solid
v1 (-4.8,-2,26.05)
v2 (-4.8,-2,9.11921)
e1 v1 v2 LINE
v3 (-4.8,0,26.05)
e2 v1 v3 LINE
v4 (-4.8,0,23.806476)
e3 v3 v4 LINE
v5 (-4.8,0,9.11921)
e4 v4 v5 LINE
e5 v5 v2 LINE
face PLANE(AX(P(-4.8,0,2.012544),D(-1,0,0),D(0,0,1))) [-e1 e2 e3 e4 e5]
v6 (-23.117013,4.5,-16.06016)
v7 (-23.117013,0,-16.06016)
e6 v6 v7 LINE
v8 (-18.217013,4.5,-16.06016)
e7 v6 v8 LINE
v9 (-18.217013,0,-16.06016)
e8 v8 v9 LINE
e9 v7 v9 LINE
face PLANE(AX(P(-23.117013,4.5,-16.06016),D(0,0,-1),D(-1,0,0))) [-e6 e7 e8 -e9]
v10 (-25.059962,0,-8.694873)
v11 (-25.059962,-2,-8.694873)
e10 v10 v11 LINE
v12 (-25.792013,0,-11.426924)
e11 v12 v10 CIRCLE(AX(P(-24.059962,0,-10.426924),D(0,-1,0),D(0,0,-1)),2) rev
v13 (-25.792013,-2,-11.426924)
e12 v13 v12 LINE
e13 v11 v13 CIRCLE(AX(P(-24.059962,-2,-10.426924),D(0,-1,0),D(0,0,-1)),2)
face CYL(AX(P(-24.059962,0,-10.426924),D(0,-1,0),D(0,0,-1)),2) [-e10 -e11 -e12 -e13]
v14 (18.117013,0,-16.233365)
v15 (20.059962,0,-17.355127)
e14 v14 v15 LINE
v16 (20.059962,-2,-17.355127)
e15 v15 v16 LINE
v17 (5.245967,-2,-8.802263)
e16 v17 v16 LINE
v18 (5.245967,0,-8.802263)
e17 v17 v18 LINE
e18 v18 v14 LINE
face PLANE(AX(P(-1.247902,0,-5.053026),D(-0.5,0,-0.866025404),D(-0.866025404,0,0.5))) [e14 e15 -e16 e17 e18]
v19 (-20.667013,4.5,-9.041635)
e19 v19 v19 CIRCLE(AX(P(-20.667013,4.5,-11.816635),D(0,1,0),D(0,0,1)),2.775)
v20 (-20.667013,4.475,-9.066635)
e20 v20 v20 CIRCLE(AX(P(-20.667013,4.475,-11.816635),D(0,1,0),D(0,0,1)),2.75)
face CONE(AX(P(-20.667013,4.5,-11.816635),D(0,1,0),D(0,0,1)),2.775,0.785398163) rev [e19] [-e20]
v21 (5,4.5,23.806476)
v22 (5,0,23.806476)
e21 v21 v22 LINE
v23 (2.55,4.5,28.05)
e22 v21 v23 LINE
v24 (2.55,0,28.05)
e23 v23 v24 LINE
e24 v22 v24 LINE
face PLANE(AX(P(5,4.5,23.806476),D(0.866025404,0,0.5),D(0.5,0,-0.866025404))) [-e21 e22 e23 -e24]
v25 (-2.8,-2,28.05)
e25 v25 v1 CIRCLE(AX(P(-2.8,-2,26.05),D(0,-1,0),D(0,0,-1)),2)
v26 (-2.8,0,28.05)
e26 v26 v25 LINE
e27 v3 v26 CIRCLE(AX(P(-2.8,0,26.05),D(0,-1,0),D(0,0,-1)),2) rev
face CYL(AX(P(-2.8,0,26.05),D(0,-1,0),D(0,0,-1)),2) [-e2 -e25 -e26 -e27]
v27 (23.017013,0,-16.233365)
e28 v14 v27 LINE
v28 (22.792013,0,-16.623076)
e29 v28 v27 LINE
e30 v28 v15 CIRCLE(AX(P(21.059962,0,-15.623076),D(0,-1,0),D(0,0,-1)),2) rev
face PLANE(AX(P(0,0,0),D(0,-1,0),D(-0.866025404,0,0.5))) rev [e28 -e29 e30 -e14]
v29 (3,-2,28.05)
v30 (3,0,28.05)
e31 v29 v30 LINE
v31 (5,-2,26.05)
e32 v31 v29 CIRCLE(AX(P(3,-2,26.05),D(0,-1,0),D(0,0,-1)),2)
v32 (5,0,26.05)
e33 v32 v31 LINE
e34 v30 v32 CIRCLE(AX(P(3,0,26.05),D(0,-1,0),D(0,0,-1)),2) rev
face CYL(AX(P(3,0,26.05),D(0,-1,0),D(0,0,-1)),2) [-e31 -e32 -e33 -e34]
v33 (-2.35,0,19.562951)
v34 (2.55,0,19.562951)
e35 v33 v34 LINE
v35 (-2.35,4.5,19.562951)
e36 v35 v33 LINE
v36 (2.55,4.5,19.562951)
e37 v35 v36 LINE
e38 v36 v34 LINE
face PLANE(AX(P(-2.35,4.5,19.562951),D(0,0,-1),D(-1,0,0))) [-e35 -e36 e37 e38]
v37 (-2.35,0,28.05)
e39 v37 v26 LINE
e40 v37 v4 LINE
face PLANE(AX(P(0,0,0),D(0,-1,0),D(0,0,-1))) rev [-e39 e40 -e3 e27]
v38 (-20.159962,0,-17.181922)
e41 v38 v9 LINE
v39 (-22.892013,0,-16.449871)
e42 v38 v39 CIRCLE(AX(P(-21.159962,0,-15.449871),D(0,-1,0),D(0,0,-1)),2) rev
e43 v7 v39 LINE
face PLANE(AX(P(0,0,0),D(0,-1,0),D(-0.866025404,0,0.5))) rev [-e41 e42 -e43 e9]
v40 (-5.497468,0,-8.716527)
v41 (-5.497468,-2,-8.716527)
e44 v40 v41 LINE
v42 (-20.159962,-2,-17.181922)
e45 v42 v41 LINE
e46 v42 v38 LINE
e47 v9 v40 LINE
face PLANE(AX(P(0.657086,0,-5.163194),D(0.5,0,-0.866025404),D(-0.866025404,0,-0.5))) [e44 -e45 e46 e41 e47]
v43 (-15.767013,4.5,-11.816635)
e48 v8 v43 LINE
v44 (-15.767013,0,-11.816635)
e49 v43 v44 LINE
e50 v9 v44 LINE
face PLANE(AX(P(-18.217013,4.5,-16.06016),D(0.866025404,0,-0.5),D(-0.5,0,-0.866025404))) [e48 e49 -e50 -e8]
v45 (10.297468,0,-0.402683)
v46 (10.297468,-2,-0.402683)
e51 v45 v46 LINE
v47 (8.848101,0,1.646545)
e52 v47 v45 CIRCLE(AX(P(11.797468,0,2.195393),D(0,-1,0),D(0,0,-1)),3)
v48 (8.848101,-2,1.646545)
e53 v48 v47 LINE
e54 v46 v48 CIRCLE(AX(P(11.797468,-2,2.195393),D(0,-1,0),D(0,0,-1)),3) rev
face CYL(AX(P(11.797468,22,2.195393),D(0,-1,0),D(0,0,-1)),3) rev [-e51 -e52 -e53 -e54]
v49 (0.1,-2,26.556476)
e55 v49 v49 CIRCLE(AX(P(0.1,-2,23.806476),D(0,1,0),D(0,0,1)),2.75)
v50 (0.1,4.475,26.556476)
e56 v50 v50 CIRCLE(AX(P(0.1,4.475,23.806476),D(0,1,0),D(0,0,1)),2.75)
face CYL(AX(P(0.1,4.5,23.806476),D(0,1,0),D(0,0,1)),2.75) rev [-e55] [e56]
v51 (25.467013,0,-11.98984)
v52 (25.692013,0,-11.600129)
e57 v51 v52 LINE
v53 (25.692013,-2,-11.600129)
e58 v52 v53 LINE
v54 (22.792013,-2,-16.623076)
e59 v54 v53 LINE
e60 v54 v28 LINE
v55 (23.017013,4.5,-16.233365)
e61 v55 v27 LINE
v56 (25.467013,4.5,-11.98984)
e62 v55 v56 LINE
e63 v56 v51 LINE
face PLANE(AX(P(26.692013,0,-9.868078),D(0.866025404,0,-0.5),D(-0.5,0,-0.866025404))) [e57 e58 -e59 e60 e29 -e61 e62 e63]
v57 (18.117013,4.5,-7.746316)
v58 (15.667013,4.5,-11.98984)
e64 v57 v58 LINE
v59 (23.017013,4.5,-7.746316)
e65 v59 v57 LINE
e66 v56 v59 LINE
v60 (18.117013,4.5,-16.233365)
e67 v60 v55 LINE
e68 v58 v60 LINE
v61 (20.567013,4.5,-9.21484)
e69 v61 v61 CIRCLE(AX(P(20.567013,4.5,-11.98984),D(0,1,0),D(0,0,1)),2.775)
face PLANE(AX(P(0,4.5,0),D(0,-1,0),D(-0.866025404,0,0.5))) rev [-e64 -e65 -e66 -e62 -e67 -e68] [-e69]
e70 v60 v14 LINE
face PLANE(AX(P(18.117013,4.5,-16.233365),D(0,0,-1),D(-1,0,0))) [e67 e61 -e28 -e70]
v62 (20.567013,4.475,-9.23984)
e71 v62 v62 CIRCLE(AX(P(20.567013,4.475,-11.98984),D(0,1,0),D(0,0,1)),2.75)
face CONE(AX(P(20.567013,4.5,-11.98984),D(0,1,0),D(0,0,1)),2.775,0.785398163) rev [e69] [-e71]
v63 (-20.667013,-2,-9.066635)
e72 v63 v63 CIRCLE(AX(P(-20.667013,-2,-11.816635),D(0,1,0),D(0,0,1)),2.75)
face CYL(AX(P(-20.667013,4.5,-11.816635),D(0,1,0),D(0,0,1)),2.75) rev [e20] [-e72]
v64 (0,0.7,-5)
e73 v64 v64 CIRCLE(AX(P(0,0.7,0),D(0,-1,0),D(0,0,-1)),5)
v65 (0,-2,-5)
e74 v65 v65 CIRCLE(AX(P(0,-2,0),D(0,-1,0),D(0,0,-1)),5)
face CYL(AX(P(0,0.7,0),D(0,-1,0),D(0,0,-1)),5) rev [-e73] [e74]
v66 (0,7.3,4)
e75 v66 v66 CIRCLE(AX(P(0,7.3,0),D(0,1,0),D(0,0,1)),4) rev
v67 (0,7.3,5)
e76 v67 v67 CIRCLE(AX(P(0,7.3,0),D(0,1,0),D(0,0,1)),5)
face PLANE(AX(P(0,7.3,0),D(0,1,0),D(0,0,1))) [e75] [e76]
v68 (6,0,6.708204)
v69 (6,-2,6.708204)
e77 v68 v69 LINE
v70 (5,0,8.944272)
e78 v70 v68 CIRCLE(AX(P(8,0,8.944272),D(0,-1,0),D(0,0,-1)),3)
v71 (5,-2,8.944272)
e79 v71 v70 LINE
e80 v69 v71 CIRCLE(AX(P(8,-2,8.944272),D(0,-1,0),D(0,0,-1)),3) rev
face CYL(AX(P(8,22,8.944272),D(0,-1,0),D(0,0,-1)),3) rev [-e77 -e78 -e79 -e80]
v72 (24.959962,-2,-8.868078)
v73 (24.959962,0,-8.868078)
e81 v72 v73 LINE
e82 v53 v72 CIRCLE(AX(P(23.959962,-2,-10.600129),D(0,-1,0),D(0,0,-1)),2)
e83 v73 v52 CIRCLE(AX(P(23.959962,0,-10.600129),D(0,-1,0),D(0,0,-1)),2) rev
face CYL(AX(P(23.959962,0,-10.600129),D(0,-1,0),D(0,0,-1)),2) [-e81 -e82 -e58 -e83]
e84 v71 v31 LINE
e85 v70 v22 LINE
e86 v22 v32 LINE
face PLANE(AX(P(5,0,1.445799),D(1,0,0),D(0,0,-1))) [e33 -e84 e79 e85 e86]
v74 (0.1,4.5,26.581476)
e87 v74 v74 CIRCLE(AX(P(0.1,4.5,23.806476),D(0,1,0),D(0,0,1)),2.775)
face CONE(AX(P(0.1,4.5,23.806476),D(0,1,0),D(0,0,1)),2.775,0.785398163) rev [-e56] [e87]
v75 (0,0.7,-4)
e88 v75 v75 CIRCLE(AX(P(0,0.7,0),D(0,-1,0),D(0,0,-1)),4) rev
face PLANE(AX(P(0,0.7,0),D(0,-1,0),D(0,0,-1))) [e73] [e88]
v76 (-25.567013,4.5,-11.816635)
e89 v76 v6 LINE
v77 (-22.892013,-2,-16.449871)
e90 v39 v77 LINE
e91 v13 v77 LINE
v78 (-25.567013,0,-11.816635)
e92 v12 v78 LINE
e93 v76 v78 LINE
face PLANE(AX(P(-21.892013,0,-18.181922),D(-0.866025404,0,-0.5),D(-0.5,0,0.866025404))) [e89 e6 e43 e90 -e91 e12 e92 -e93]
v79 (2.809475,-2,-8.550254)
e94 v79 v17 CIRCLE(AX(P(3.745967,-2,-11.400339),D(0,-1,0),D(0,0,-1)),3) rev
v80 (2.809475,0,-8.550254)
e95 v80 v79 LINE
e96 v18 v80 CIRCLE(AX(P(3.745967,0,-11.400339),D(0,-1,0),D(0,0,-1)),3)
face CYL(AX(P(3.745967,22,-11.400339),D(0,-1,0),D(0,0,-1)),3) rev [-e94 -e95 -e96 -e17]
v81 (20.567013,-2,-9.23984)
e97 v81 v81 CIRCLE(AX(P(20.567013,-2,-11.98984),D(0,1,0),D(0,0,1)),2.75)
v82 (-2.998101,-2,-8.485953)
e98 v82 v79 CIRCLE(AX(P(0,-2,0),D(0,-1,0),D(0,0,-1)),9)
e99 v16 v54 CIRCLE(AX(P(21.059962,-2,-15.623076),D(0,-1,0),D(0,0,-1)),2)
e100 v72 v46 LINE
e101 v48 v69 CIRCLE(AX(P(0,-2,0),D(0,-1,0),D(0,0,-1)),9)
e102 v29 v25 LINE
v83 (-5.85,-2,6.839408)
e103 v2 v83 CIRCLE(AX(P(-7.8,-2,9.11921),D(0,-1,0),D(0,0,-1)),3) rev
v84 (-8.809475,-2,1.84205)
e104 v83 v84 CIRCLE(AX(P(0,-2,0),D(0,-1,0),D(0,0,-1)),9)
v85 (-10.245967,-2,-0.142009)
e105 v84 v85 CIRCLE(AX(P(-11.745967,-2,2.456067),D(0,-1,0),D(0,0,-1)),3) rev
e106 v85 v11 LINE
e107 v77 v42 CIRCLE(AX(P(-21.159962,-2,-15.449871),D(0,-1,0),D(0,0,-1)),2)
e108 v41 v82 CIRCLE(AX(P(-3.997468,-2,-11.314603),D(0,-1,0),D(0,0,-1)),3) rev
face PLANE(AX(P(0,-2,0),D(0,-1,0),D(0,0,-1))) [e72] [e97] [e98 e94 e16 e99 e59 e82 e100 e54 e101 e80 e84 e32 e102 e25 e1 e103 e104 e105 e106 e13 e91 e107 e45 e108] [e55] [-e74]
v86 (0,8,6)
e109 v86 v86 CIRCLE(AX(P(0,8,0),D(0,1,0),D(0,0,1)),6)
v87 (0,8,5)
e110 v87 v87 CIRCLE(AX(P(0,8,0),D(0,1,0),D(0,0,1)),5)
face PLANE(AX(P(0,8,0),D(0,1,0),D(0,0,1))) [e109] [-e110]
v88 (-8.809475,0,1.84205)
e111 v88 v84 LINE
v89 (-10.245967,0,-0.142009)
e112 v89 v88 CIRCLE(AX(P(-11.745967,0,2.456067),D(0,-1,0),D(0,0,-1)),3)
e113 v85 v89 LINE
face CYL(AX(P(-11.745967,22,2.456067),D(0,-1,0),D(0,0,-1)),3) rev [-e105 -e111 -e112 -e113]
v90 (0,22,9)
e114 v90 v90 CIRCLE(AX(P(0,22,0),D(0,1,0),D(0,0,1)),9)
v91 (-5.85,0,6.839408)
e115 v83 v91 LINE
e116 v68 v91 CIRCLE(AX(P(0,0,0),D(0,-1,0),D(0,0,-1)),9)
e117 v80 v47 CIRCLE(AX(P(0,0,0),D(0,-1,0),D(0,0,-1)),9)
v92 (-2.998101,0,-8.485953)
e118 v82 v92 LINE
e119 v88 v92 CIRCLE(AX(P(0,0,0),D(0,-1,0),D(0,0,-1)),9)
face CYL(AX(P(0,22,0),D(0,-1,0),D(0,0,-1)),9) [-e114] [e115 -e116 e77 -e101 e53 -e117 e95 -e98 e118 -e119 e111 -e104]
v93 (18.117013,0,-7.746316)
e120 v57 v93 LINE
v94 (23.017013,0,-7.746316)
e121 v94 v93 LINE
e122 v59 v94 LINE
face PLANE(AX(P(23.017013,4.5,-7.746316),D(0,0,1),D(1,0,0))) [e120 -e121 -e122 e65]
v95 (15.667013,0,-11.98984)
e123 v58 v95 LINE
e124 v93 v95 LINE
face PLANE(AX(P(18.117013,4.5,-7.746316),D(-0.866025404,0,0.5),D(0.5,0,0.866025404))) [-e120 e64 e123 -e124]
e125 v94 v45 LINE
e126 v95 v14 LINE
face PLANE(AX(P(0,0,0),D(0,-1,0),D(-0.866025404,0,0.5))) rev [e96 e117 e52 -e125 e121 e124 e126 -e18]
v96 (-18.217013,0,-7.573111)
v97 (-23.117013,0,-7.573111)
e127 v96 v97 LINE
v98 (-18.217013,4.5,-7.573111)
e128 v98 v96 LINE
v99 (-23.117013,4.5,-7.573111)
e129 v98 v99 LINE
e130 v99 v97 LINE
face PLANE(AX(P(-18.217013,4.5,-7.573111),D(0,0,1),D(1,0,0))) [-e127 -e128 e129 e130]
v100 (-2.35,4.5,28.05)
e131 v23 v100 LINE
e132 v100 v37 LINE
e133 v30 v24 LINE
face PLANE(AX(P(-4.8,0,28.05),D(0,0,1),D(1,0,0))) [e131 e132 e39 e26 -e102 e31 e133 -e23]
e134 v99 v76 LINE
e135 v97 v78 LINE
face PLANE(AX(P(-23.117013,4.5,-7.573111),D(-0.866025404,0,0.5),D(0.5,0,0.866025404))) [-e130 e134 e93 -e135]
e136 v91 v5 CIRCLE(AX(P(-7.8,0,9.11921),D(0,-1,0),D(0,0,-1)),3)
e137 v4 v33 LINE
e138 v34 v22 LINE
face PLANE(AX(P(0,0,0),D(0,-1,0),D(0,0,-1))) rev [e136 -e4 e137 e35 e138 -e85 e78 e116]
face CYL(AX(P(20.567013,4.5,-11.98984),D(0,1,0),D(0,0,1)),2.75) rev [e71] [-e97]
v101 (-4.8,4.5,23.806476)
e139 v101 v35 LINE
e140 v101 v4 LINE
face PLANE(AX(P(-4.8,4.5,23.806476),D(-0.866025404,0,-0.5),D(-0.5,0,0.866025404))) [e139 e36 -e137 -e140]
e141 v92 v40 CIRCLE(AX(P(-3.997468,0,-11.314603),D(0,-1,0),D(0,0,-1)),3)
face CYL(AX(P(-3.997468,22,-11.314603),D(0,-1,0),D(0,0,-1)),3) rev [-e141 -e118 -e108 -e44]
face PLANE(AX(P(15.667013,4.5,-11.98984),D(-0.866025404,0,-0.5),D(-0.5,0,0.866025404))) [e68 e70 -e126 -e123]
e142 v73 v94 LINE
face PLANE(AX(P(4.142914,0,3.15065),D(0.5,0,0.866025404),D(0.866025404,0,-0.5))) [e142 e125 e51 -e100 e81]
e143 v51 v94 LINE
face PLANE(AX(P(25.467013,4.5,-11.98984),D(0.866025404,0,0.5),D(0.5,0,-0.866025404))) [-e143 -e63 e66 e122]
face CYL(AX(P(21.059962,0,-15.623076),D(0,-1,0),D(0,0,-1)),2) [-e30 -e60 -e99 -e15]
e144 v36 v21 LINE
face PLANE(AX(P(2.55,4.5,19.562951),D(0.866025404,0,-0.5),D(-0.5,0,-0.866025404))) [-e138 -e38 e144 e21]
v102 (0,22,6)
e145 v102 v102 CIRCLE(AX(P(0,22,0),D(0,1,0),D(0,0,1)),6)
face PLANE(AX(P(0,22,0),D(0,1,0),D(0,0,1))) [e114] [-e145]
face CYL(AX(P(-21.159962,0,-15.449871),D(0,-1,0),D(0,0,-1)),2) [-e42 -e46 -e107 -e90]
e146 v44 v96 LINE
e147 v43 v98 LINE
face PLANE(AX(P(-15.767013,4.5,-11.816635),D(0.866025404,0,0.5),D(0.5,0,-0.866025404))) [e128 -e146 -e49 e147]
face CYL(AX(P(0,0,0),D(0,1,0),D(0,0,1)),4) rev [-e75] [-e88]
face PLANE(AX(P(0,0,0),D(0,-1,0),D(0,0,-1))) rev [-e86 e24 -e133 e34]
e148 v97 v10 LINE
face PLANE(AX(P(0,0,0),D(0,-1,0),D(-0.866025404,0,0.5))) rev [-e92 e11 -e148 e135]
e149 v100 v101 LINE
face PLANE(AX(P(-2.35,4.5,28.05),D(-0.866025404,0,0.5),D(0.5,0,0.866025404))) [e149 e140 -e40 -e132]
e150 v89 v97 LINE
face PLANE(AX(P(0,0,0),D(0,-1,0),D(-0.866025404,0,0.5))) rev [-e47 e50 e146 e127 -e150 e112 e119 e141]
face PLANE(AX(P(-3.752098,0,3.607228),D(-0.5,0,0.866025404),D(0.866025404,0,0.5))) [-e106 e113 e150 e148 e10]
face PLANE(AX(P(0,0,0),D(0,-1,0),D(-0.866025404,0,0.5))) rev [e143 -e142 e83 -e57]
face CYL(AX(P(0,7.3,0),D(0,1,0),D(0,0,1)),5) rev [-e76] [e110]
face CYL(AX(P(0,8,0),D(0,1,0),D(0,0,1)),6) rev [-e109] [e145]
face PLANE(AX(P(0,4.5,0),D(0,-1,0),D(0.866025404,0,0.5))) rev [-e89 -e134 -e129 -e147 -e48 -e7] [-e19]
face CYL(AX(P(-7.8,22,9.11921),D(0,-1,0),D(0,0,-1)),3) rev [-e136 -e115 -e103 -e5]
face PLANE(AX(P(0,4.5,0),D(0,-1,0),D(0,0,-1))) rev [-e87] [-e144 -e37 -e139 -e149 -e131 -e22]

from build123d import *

# Parameters (mm, degrees)
ESQUISSE2_R                  = 9
BOSS_EXTRU_1_DEPTH           = 22
ESQUISSE5_R                  = 5
BOSS_EXTRU_3_DEPTH           = 2
ESQUISSE6_R                  = 6
ENL_V_MAT_EXTRU_2_DEPTH      = 14
ESQUISSE7_R                  = 4
ENL_V_MAT_EXTRU_3_DEPTH      = 19.920887928
ESQUISSE8_R                  = 5
ENL_V_MAT_EXTRU_4_DEPTH      = 0.7
ENL_V_START                  = -0.7
ESQUISSE9_R                  = 5
ENL_V_MAT_EXTRU_5_DEPTH      = 0.7
BOSS_EXTRU_4_START           = 2
ESQUISSE11_R                 = 9
ESQUISSE11_R_2               = 5
BOSS_EXTRU_4_DEPTH           = 2
BOSS_EXTRU_5_DEPTH           = 2
R_P_TITION_CIRCULAIRE1_COUNT = 3
BOSS_EXTRU_6_DEPTH           = 6.5
R_P_TITION_CIRCULAIRE2_COUNT = 3
D_GAGEMENT_M51_D             = 5.5
D_GAGEMENT_M51_CSINK_D       = 5.55
D_GAGEMENT_M51_CSINK_ANGLE   = 90
R_P_TITION_CIRCULAIRE3_COUNT = 3
CONG_1_R                     = 3
CONG_2_R                     = 3
CONG_3_R                     = 2


with BuildPart() as part:
    # Esquisse2 → Boss.-Extru.1 (new body)
    with BuildSketch(Plane(origin=(0, 0, 0), x_dir=(1, 0, 0), z_dir=(0, 1, 0))):
        Circle(ESQUISSE2_R)
    extrude(amount=BOSS_EXTRU_1_DEPTH)

    # Esquisse5 → Boss.-Extru.3 (add)
    with BuildSketch(Plane(origin=(0, 22, 0), x_dir=(1, 0, 0), z_dir=(0, 1, 0))):
        Circle(ESQUISSE5_R)
    extrude(amount=-BOSS_EXTRU_3_DEPTH)

    # Esquisse6 → Enlèv. mat.-Extru.2 (cut)
    with BuildSketch(Plane(origin=(0, 22, 0), x_dir=(1, 0, 0), z_dir=(0, 1, 0))):
        Circle(ESQUISSE6_R)
    extrude(amount=-ENL_V_MAT_EXTRU_2_DEPTH, mode=Mode.SUBTRACT)

    # Esquisse7 → Enlèv. mat.-Extru.3 (cut, through all)
    with BuildSketch(Plane(origin=(0, 8, 0), x_dir=(1, 0, 0), z_dir=(0, 1, 0))):
        Circle(ESQUISSE7_R)
    extrude(amount=-ENL_V_MAT_EXTRU_3_DEPTH, mode=Mode.SUBTRACT)

    # Esquisse8 → Enlèv. mat.-Extru.4 (cut)
    with BuildSketch(Plane.XZ):
        Circle(ESQUISSE8_R)
    extrude(amount=-ENL_V_MAT_EXTRU_4_DEPTH, mode=Mode.SUBTRACT)

    # Esquisse9 → Enlèv. mat.-Extru.5 (cut)
    with BuildSketch(Plane(origin=(0, 8, 0), x_dir=(1, 0, 0), z_dir=(0, 1, 0)).offset(ENL_V_START)):
        Circle(ESQUISSE9_R)
    extrude(amount=ENL_V_MAT_EXTRU_5_DEPTH, mode=Mode.SUBTRACT)

    # Esquisse11 → Boss.-Extru.4 (add)
    with BuildSketch(Plane.XZ.offset(BOSS_EXTRU_4_START)):
        Circle(ESQUISSE11_R)
        Circle(ESQUISSE11_R_2, mode=Mode.SUBTRACT)
    extrude(amount=-BOSS_EXTRU_4_DEPTH)

    # Esquisse12 → Boss.-Extru.5 (add)
    with BuildSketch(Plane.XZ.offset(2)):
        with BuildLine():
            Line((-4.8, 2.012544091), (-4.8, 28.05))
            Line((-4.8, 28.05), (5, 28.05))
            Line((5, 28.05), (5, 1.445798644))
            ThreePointArc((5, 1.445798644), (0.300499751, 5.196155658), (-4.8, 2.012544091))
        make_face()
    boss_extru_5 = extrude(amount=-BOSS_EXTRU_5_DEPTH)

    # Répétition circulaire1: Boss.-Extru.5 ×3 about axis
    r_p_tition_circulaire1_axis = Axis((0, 0, 0), (0, 1, 0))
    for i in range(1, R_P_TITION_CIRCULAIRE1_COUNT):
        add(boss_extru_5.rotate(r_p_tition_circulaire1_axis, i * 360 / R_P_TITION_CIRCULAIRE1_COUNT))

    # Esquisse13 → Boss.-Extru.6 (add)
    with BuildSketch(Plane.XZ.offset(2)):
        Polygon((-2.35, 28.05), (-4.8, 23.806475521), (-2.35, 19.562951043), (2.55, 19.562951043), (5, 23.806475521), (2.55, 28.05), align=None)
    boss_extru_6 = extrude(amount=-BOSS_EXTRU_6_DEPTH)

    # Répétition circulaire2: Boss.-Extru.6 ×3 about axis
    r_p_tition_circulaire2_axis = Axis((0, 0, 0), (0, 1, 0))
    for i in range(1, R_P_TITION_CIRCULAIRE2_COUNT):
        add(boss_extru_6.rotate(r_p_tition_circulaire2_axis, i * 360 / R_P_TITION_CIRCULAIRE2_COUNT))

    # Dégagement M51 (through all)
    with Locations(Plane(origin=(0, 4.5, 0), x_dir=(1, 0, 0), z_dir=(0, 1, 0))):
        with Locations((0.1, -23.806475521)):
            d_gagement_m51 = CounterSinkHole(D_GAGEMENT_M51_D / 2, D_GAGEMENT_M51_CSINK_D / 2, counter_sink_angle=D_GAGEMENT_M51_CSINK_ANGLE)

    # Répétition circulaire3: Dégagement M51 ×3 about axis
    r_p_tition_circulaire3_axis = Axis((0, 22, 0), (0, -1, 0))
    for i in range(1, R_P_TITION_CIRCULAIRE3_COUNT):
        add(d_gagement_m51.rotate(r_p_tition_circulaire3_axis, i * 360 / R_P_TITION_CIRCULAIRE3_COUNT), mode=Mode.SUBTRACT)

    # Congé1
    cong_1_edges = [part.edges().sort_by_distance(p)[0] for p in [
        (-4.8, -1, 7.613146524),
    ]]
    fillet(cong_1_edges, radius=CONG_1_R)

    # Congé2
    cong_2_edges = [part.edges().sort_by_distance(p)[0] for p in [
        (-4.193178293, -1, -7.9634952),
        (3.980740698, -1, -8.071784406),
        (8.993178293, -1, 0.350348676),
        (5, -1, 7.483314774),
        (-8.980740698, -1, 0.588469632),
    ]]
    fillet(cong_2_edges, radius=CONG_2_R)

    # Congé3
    cong_3_edges = [part.edges().sort_by_distance(p)[0] for p in [
        (-21.892012576, -1, -18.181921938),
        (-26.792012576, -1, -9.694872981),
        (-4.8, -1, 28.05),
        (5, -1, 28.05),
        (26.692012576, -1, -9.868078062),
        (21.792012576, -1, -18.355127019),
    ]]
    fillet(cong_3_edges, radius=CONG_3_R)


solid = part.part
